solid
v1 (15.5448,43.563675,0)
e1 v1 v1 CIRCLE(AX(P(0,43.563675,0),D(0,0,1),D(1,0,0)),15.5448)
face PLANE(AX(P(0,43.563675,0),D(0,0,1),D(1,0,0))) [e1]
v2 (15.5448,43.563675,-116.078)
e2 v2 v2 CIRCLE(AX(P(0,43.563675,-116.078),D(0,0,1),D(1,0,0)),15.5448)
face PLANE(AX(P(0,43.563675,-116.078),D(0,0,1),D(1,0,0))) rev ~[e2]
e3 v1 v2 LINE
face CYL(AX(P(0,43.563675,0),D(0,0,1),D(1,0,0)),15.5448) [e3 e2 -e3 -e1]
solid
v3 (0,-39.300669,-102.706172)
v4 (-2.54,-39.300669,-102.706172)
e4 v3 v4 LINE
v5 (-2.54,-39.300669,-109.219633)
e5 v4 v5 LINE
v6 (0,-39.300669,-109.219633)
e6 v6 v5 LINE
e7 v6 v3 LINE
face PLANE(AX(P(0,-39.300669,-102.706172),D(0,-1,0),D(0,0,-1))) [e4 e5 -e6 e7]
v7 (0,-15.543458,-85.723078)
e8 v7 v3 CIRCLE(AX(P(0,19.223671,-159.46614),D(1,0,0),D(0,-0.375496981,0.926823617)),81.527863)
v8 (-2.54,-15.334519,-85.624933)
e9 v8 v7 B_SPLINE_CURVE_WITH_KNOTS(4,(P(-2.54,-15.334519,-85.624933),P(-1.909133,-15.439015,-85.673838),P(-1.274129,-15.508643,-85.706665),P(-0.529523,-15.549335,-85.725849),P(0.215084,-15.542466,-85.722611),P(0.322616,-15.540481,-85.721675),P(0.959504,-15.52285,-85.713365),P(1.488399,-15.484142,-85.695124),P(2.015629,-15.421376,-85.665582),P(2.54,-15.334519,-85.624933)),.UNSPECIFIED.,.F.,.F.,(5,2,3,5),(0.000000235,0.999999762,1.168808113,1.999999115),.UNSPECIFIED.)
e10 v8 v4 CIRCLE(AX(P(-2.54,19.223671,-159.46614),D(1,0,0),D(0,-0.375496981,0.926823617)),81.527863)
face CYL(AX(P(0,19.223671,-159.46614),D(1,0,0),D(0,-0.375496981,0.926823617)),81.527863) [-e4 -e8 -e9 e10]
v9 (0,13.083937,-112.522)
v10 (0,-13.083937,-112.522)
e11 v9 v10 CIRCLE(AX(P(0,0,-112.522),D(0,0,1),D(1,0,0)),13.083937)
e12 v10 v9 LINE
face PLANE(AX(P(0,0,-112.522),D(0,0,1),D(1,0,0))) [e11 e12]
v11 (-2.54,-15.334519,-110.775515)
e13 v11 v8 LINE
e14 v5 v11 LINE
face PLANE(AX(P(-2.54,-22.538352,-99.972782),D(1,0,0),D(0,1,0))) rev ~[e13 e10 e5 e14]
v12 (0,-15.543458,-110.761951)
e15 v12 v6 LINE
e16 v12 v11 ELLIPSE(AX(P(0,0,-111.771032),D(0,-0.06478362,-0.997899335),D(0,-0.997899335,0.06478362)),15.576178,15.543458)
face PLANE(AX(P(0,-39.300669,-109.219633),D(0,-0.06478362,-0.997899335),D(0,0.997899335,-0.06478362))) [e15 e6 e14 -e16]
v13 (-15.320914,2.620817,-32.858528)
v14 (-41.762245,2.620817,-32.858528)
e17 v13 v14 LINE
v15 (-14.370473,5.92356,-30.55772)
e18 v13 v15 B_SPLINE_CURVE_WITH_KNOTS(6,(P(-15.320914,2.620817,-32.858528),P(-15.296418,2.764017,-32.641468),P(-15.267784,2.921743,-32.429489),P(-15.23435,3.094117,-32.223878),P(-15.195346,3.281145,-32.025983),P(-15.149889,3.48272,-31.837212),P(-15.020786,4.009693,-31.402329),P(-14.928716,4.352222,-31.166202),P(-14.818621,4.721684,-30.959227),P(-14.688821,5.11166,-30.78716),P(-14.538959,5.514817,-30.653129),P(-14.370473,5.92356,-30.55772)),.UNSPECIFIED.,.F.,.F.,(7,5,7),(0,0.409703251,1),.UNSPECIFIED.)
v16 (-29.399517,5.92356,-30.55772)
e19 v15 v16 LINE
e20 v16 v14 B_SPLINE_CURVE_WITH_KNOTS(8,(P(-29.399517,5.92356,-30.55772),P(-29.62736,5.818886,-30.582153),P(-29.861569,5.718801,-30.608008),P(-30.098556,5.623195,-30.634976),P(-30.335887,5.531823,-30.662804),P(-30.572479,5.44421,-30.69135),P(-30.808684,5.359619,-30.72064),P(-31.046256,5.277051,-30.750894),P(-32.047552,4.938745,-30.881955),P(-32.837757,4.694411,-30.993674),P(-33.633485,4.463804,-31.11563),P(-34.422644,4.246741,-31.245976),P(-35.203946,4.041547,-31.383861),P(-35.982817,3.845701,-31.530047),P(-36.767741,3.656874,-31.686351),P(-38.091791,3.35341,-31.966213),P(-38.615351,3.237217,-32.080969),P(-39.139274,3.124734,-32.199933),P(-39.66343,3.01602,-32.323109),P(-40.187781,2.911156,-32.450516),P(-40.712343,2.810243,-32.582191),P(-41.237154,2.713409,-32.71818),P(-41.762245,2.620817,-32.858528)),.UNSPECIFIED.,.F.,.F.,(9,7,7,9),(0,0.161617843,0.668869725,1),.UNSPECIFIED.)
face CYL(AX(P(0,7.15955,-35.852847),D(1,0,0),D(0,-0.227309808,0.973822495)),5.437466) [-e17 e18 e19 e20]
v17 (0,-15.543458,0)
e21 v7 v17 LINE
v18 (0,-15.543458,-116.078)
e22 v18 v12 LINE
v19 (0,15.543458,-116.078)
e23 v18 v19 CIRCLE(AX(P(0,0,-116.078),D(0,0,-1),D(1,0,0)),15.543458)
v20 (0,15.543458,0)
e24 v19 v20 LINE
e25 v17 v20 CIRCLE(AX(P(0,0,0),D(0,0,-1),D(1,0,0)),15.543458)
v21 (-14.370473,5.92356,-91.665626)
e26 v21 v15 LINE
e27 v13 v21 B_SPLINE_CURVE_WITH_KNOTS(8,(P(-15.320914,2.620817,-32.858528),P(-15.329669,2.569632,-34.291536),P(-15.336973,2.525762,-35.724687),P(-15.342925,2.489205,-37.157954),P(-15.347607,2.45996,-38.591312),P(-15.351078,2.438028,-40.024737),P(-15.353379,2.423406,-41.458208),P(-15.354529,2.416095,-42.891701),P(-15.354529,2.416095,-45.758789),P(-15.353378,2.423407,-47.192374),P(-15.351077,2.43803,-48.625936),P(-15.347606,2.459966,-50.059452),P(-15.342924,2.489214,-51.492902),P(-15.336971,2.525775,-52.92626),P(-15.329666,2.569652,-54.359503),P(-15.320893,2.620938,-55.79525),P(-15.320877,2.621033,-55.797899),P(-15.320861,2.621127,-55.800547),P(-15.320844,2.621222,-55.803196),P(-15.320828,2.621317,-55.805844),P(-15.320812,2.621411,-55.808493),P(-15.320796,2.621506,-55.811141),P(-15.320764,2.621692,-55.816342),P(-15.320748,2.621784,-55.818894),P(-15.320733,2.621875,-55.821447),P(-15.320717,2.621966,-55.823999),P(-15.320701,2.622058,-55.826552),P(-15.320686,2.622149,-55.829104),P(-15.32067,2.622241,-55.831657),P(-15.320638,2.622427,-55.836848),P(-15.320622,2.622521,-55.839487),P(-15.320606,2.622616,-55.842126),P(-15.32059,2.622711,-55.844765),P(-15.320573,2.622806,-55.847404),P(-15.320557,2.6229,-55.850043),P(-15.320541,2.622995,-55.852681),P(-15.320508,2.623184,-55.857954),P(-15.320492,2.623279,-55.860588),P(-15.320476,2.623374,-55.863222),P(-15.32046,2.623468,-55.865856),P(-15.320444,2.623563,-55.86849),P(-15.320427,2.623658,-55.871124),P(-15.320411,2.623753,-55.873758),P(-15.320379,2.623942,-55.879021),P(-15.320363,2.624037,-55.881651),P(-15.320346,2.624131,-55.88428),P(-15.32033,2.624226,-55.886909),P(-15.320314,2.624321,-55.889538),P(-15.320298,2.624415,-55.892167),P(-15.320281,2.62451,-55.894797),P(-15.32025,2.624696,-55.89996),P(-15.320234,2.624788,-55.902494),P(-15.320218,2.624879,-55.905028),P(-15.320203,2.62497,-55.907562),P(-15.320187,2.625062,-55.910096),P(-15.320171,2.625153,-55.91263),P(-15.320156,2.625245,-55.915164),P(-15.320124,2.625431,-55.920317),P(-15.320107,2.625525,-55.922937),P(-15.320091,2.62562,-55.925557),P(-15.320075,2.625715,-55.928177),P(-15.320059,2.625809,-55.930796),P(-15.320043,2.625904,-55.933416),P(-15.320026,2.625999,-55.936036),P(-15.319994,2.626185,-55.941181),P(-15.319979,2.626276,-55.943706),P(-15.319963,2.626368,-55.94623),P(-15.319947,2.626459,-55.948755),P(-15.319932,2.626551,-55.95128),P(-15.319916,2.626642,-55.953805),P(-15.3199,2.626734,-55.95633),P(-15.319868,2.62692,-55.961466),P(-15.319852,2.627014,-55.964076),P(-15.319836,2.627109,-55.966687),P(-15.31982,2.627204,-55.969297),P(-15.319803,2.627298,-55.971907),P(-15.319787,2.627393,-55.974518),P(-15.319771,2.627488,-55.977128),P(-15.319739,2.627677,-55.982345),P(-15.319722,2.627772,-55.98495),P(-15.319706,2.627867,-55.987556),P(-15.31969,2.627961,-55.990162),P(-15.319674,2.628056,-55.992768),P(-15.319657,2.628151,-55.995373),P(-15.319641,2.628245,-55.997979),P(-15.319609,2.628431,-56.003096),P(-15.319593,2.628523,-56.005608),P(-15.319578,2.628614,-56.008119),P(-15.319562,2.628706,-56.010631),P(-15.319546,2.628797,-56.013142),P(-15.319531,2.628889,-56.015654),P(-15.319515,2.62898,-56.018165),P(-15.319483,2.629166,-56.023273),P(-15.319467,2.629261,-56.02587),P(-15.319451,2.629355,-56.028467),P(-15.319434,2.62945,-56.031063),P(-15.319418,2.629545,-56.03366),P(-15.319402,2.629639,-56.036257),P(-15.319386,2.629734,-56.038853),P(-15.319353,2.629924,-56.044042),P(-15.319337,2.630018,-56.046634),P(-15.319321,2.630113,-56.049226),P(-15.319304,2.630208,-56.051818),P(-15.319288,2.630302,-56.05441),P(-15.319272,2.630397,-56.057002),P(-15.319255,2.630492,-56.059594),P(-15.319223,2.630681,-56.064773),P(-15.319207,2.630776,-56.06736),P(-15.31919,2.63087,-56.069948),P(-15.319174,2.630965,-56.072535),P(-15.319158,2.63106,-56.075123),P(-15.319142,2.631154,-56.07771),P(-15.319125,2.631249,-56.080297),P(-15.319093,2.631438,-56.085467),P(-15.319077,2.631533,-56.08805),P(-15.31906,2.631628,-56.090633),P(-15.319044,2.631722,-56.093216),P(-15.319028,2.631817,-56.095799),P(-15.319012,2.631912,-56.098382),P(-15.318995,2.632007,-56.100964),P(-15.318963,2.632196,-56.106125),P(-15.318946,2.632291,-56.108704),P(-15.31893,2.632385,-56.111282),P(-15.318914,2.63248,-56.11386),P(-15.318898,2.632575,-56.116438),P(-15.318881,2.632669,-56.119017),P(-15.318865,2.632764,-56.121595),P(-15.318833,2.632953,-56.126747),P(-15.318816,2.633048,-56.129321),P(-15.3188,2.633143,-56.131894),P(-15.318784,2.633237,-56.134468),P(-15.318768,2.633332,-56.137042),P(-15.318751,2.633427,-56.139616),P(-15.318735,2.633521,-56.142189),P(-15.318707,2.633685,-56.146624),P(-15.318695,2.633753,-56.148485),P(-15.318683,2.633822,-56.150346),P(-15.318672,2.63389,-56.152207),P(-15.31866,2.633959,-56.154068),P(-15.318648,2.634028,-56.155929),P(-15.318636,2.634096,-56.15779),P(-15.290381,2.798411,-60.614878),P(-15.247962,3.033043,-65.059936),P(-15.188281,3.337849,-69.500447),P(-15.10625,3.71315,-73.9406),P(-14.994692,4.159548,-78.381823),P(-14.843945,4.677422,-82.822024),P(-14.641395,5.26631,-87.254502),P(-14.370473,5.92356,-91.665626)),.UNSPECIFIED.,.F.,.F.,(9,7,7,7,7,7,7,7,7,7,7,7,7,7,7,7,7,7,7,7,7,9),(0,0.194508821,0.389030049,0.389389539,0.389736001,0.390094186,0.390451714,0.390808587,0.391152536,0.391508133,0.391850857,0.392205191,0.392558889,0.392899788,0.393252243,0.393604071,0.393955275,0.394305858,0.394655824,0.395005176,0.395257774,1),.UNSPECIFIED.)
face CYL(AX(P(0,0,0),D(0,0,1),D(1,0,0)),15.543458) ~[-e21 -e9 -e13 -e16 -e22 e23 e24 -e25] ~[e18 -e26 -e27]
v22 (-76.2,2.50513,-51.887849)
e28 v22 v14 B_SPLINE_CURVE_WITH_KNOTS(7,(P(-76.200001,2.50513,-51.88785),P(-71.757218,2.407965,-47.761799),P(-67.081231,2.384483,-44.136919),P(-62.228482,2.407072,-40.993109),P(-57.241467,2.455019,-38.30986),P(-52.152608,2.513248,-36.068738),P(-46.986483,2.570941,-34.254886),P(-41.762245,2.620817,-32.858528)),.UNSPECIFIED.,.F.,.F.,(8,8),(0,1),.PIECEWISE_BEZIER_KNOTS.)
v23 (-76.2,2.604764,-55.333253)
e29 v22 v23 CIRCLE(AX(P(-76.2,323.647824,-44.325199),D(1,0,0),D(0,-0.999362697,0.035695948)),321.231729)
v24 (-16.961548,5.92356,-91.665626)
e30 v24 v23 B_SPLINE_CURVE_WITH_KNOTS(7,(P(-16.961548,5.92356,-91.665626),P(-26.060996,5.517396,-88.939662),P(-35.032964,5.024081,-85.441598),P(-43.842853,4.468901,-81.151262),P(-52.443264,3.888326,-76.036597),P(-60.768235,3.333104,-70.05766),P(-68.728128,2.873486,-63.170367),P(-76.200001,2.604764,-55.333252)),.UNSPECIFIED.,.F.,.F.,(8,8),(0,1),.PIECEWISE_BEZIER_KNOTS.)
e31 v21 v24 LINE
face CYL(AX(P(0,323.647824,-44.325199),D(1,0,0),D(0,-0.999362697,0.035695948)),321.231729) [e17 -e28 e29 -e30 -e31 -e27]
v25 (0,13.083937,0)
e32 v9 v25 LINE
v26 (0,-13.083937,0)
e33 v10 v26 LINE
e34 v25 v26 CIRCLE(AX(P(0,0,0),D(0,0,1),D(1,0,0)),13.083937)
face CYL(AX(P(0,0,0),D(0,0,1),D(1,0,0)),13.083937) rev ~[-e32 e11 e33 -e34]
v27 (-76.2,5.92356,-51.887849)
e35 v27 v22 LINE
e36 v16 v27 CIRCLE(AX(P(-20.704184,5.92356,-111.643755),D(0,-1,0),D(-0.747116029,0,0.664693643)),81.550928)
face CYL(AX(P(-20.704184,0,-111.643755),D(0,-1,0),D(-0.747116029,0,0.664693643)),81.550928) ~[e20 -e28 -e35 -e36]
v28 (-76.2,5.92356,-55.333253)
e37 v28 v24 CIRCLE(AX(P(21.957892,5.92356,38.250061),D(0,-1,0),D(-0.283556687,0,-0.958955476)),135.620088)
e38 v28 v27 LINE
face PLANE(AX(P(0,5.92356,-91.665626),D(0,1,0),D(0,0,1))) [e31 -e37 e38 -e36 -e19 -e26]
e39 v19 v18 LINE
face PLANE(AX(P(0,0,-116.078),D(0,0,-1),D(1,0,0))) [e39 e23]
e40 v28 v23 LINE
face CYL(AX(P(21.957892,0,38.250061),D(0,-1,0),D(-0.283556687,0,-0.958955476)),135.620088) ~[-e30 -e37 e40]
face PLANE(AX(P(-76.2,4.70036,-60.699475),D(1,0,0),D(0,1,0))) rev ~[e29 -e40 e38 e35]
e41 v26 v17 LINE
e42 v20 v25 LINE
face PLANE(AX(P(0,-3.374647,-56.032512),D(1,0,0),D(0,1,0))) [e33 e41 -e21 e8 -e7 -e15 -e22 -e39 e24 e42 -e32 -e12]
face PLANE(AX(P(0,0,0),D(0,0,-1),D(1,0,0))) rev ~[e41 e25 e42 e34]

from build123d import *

# Parameters (mm, degrees)
F2_R          = 15.5434576405
F3_DEPTH      = 116.078
F5_DEPTH      = 2.54
F5_DEPTH_BACK = 2.54
F7_DEPTH      = 76.2
F7_DEPTH_BACK = 76.2
F9_DEPTH      = 72.898
F11_DEPTH     = 25.4
F12_R         = 13.0839369501
F13_DEPTH     = 112.522
F14_W         = 116.2168830633
F14_H         = 197.326593101
F15_DEPTH     = 105.156
F16_R         = 15.5448
F17_DEPTH     = 116.078


# Not quite as in the source:
# - the program builds the solid bodies; features that only make, move or delete a surface that nothing else refers to are left out


with BuildPart() as f3:
    # F2 (on face) → F3 (new body)
    with BuildSketch(Plane(origin=(0, 0, 0), x_dir=(1, 0, 0), z_dir=(0, 0, -1))):
        Circle(F2_R)
    extrude(amount=F3_DEPTH)

    # F4 (on Right) → F5 (join, two sides)
    with BuildSketch(Plane.YZ) as f5_sk:
        with BuildLine():
            Line((-11.3897956908, -111.0316067934), (-11.3897956908, -83.9041918516))
            ThreePointArc((-11.3897956908, -83.9041918516), (-26.3259256593, -91.8493771932), (-39.3006689847, -102.7061715722))
            Line((-39.3006689847, -102.7061715722), (-39.3006689847, -109.2196330428))
            Line((-39.3006689847, -109.2196330428), (-11.3897956908, -111.0316067934))
        make_face()
    extrude(amount=F5_DEPTH)
    extrude(f5_sk.sketch, amount=-F5_DEPTH_BACK)

    # F6 (on Right) → F7 (join, two sides)
    with BuildSketch(Plane.YZ) as f7_sk:
        with BuildLine():
            Line((5.9235603549, -91.6656255722), (5.9235603549, -30.5577199906))
            ThreePointArc((5.9235603549, -30.5577199906), (4.051450151, -31.3912602494), (2.6208171621, -32.8585281968))
            ThreePointArc((2.6208171621, -32.8585281968), (2.92151535, -62.3379338406), (5.9235603549, -91.6656255722))
        make_face()
    extrude(amount=F7_DEPTH)
    extrude(f7_sk.sketch, amount=-F7_DEPTH_BACK)

    # F8 (on Front) → F9 (cut)
    with BuildSketch(Plane.XZ):
        with BuildLine():
            ThreePointArc((-81.6321894526, -57.4373714626), (-51.7546829498, -36.2353974331), (-15.6106846407, -30.2520468831))
            Line((-15.6106846407, -30.2520468831), (-81.6321894526, -24.7040204704))
            Line((-81.6321894526, -24.7040204704), (-81.6321894526, -57.4373714626))
        make_face()
    extrude(amount=-F9_DEPTH, mode=Mode.SUBTRACT)

    # F10 (on Front) → F11 (cut)
    with BuildSketch(Plane.XZ):
        with BuildLine():
            ThreePointArc((-16.4980906993, -91.8035656214), (-49.0002384885, -77.3256808029), (-76.6182541847, -54.8925809562))
            Line((-76.6182541847, -54.8925809562), (-93.9552336931, -110.2590560913))
            Line((-93.9552336931, -110.2590560913), (-16.4980906993, -91.8035656214))
        make_face()
    extrude(amount=-F11_DEPTH, mode=Mode.SUBTRACT)

    # F12 (on Top) → F13 (cut)
    with BuildSketch(Plane.XY):
        Circle(F12_R)
    extrude(amount=-F13_DEPTH, mode=Mode.SUBTRACT)

    # F14 (on Right) → F15 (cut)
    with BuildSketch(Plane.YZ):
        with Locations((-3.3746473491, -56.032512337)):
            Rectangle(F14_W, F14_H)
    extrude(amount=F15_DEPTH, mode=Mode.SUBTRACT)


with BuildPart() as f17:
    # F16 (on Top) → F17 (new body)
    with BuildSketch(Plane.XY):
        with Locations((0, 43.5636749731)):
            Circle(F16_R)
    extrude(amount=-F17_DEPTH)


solid = Compound([f3.part, f17.part])
